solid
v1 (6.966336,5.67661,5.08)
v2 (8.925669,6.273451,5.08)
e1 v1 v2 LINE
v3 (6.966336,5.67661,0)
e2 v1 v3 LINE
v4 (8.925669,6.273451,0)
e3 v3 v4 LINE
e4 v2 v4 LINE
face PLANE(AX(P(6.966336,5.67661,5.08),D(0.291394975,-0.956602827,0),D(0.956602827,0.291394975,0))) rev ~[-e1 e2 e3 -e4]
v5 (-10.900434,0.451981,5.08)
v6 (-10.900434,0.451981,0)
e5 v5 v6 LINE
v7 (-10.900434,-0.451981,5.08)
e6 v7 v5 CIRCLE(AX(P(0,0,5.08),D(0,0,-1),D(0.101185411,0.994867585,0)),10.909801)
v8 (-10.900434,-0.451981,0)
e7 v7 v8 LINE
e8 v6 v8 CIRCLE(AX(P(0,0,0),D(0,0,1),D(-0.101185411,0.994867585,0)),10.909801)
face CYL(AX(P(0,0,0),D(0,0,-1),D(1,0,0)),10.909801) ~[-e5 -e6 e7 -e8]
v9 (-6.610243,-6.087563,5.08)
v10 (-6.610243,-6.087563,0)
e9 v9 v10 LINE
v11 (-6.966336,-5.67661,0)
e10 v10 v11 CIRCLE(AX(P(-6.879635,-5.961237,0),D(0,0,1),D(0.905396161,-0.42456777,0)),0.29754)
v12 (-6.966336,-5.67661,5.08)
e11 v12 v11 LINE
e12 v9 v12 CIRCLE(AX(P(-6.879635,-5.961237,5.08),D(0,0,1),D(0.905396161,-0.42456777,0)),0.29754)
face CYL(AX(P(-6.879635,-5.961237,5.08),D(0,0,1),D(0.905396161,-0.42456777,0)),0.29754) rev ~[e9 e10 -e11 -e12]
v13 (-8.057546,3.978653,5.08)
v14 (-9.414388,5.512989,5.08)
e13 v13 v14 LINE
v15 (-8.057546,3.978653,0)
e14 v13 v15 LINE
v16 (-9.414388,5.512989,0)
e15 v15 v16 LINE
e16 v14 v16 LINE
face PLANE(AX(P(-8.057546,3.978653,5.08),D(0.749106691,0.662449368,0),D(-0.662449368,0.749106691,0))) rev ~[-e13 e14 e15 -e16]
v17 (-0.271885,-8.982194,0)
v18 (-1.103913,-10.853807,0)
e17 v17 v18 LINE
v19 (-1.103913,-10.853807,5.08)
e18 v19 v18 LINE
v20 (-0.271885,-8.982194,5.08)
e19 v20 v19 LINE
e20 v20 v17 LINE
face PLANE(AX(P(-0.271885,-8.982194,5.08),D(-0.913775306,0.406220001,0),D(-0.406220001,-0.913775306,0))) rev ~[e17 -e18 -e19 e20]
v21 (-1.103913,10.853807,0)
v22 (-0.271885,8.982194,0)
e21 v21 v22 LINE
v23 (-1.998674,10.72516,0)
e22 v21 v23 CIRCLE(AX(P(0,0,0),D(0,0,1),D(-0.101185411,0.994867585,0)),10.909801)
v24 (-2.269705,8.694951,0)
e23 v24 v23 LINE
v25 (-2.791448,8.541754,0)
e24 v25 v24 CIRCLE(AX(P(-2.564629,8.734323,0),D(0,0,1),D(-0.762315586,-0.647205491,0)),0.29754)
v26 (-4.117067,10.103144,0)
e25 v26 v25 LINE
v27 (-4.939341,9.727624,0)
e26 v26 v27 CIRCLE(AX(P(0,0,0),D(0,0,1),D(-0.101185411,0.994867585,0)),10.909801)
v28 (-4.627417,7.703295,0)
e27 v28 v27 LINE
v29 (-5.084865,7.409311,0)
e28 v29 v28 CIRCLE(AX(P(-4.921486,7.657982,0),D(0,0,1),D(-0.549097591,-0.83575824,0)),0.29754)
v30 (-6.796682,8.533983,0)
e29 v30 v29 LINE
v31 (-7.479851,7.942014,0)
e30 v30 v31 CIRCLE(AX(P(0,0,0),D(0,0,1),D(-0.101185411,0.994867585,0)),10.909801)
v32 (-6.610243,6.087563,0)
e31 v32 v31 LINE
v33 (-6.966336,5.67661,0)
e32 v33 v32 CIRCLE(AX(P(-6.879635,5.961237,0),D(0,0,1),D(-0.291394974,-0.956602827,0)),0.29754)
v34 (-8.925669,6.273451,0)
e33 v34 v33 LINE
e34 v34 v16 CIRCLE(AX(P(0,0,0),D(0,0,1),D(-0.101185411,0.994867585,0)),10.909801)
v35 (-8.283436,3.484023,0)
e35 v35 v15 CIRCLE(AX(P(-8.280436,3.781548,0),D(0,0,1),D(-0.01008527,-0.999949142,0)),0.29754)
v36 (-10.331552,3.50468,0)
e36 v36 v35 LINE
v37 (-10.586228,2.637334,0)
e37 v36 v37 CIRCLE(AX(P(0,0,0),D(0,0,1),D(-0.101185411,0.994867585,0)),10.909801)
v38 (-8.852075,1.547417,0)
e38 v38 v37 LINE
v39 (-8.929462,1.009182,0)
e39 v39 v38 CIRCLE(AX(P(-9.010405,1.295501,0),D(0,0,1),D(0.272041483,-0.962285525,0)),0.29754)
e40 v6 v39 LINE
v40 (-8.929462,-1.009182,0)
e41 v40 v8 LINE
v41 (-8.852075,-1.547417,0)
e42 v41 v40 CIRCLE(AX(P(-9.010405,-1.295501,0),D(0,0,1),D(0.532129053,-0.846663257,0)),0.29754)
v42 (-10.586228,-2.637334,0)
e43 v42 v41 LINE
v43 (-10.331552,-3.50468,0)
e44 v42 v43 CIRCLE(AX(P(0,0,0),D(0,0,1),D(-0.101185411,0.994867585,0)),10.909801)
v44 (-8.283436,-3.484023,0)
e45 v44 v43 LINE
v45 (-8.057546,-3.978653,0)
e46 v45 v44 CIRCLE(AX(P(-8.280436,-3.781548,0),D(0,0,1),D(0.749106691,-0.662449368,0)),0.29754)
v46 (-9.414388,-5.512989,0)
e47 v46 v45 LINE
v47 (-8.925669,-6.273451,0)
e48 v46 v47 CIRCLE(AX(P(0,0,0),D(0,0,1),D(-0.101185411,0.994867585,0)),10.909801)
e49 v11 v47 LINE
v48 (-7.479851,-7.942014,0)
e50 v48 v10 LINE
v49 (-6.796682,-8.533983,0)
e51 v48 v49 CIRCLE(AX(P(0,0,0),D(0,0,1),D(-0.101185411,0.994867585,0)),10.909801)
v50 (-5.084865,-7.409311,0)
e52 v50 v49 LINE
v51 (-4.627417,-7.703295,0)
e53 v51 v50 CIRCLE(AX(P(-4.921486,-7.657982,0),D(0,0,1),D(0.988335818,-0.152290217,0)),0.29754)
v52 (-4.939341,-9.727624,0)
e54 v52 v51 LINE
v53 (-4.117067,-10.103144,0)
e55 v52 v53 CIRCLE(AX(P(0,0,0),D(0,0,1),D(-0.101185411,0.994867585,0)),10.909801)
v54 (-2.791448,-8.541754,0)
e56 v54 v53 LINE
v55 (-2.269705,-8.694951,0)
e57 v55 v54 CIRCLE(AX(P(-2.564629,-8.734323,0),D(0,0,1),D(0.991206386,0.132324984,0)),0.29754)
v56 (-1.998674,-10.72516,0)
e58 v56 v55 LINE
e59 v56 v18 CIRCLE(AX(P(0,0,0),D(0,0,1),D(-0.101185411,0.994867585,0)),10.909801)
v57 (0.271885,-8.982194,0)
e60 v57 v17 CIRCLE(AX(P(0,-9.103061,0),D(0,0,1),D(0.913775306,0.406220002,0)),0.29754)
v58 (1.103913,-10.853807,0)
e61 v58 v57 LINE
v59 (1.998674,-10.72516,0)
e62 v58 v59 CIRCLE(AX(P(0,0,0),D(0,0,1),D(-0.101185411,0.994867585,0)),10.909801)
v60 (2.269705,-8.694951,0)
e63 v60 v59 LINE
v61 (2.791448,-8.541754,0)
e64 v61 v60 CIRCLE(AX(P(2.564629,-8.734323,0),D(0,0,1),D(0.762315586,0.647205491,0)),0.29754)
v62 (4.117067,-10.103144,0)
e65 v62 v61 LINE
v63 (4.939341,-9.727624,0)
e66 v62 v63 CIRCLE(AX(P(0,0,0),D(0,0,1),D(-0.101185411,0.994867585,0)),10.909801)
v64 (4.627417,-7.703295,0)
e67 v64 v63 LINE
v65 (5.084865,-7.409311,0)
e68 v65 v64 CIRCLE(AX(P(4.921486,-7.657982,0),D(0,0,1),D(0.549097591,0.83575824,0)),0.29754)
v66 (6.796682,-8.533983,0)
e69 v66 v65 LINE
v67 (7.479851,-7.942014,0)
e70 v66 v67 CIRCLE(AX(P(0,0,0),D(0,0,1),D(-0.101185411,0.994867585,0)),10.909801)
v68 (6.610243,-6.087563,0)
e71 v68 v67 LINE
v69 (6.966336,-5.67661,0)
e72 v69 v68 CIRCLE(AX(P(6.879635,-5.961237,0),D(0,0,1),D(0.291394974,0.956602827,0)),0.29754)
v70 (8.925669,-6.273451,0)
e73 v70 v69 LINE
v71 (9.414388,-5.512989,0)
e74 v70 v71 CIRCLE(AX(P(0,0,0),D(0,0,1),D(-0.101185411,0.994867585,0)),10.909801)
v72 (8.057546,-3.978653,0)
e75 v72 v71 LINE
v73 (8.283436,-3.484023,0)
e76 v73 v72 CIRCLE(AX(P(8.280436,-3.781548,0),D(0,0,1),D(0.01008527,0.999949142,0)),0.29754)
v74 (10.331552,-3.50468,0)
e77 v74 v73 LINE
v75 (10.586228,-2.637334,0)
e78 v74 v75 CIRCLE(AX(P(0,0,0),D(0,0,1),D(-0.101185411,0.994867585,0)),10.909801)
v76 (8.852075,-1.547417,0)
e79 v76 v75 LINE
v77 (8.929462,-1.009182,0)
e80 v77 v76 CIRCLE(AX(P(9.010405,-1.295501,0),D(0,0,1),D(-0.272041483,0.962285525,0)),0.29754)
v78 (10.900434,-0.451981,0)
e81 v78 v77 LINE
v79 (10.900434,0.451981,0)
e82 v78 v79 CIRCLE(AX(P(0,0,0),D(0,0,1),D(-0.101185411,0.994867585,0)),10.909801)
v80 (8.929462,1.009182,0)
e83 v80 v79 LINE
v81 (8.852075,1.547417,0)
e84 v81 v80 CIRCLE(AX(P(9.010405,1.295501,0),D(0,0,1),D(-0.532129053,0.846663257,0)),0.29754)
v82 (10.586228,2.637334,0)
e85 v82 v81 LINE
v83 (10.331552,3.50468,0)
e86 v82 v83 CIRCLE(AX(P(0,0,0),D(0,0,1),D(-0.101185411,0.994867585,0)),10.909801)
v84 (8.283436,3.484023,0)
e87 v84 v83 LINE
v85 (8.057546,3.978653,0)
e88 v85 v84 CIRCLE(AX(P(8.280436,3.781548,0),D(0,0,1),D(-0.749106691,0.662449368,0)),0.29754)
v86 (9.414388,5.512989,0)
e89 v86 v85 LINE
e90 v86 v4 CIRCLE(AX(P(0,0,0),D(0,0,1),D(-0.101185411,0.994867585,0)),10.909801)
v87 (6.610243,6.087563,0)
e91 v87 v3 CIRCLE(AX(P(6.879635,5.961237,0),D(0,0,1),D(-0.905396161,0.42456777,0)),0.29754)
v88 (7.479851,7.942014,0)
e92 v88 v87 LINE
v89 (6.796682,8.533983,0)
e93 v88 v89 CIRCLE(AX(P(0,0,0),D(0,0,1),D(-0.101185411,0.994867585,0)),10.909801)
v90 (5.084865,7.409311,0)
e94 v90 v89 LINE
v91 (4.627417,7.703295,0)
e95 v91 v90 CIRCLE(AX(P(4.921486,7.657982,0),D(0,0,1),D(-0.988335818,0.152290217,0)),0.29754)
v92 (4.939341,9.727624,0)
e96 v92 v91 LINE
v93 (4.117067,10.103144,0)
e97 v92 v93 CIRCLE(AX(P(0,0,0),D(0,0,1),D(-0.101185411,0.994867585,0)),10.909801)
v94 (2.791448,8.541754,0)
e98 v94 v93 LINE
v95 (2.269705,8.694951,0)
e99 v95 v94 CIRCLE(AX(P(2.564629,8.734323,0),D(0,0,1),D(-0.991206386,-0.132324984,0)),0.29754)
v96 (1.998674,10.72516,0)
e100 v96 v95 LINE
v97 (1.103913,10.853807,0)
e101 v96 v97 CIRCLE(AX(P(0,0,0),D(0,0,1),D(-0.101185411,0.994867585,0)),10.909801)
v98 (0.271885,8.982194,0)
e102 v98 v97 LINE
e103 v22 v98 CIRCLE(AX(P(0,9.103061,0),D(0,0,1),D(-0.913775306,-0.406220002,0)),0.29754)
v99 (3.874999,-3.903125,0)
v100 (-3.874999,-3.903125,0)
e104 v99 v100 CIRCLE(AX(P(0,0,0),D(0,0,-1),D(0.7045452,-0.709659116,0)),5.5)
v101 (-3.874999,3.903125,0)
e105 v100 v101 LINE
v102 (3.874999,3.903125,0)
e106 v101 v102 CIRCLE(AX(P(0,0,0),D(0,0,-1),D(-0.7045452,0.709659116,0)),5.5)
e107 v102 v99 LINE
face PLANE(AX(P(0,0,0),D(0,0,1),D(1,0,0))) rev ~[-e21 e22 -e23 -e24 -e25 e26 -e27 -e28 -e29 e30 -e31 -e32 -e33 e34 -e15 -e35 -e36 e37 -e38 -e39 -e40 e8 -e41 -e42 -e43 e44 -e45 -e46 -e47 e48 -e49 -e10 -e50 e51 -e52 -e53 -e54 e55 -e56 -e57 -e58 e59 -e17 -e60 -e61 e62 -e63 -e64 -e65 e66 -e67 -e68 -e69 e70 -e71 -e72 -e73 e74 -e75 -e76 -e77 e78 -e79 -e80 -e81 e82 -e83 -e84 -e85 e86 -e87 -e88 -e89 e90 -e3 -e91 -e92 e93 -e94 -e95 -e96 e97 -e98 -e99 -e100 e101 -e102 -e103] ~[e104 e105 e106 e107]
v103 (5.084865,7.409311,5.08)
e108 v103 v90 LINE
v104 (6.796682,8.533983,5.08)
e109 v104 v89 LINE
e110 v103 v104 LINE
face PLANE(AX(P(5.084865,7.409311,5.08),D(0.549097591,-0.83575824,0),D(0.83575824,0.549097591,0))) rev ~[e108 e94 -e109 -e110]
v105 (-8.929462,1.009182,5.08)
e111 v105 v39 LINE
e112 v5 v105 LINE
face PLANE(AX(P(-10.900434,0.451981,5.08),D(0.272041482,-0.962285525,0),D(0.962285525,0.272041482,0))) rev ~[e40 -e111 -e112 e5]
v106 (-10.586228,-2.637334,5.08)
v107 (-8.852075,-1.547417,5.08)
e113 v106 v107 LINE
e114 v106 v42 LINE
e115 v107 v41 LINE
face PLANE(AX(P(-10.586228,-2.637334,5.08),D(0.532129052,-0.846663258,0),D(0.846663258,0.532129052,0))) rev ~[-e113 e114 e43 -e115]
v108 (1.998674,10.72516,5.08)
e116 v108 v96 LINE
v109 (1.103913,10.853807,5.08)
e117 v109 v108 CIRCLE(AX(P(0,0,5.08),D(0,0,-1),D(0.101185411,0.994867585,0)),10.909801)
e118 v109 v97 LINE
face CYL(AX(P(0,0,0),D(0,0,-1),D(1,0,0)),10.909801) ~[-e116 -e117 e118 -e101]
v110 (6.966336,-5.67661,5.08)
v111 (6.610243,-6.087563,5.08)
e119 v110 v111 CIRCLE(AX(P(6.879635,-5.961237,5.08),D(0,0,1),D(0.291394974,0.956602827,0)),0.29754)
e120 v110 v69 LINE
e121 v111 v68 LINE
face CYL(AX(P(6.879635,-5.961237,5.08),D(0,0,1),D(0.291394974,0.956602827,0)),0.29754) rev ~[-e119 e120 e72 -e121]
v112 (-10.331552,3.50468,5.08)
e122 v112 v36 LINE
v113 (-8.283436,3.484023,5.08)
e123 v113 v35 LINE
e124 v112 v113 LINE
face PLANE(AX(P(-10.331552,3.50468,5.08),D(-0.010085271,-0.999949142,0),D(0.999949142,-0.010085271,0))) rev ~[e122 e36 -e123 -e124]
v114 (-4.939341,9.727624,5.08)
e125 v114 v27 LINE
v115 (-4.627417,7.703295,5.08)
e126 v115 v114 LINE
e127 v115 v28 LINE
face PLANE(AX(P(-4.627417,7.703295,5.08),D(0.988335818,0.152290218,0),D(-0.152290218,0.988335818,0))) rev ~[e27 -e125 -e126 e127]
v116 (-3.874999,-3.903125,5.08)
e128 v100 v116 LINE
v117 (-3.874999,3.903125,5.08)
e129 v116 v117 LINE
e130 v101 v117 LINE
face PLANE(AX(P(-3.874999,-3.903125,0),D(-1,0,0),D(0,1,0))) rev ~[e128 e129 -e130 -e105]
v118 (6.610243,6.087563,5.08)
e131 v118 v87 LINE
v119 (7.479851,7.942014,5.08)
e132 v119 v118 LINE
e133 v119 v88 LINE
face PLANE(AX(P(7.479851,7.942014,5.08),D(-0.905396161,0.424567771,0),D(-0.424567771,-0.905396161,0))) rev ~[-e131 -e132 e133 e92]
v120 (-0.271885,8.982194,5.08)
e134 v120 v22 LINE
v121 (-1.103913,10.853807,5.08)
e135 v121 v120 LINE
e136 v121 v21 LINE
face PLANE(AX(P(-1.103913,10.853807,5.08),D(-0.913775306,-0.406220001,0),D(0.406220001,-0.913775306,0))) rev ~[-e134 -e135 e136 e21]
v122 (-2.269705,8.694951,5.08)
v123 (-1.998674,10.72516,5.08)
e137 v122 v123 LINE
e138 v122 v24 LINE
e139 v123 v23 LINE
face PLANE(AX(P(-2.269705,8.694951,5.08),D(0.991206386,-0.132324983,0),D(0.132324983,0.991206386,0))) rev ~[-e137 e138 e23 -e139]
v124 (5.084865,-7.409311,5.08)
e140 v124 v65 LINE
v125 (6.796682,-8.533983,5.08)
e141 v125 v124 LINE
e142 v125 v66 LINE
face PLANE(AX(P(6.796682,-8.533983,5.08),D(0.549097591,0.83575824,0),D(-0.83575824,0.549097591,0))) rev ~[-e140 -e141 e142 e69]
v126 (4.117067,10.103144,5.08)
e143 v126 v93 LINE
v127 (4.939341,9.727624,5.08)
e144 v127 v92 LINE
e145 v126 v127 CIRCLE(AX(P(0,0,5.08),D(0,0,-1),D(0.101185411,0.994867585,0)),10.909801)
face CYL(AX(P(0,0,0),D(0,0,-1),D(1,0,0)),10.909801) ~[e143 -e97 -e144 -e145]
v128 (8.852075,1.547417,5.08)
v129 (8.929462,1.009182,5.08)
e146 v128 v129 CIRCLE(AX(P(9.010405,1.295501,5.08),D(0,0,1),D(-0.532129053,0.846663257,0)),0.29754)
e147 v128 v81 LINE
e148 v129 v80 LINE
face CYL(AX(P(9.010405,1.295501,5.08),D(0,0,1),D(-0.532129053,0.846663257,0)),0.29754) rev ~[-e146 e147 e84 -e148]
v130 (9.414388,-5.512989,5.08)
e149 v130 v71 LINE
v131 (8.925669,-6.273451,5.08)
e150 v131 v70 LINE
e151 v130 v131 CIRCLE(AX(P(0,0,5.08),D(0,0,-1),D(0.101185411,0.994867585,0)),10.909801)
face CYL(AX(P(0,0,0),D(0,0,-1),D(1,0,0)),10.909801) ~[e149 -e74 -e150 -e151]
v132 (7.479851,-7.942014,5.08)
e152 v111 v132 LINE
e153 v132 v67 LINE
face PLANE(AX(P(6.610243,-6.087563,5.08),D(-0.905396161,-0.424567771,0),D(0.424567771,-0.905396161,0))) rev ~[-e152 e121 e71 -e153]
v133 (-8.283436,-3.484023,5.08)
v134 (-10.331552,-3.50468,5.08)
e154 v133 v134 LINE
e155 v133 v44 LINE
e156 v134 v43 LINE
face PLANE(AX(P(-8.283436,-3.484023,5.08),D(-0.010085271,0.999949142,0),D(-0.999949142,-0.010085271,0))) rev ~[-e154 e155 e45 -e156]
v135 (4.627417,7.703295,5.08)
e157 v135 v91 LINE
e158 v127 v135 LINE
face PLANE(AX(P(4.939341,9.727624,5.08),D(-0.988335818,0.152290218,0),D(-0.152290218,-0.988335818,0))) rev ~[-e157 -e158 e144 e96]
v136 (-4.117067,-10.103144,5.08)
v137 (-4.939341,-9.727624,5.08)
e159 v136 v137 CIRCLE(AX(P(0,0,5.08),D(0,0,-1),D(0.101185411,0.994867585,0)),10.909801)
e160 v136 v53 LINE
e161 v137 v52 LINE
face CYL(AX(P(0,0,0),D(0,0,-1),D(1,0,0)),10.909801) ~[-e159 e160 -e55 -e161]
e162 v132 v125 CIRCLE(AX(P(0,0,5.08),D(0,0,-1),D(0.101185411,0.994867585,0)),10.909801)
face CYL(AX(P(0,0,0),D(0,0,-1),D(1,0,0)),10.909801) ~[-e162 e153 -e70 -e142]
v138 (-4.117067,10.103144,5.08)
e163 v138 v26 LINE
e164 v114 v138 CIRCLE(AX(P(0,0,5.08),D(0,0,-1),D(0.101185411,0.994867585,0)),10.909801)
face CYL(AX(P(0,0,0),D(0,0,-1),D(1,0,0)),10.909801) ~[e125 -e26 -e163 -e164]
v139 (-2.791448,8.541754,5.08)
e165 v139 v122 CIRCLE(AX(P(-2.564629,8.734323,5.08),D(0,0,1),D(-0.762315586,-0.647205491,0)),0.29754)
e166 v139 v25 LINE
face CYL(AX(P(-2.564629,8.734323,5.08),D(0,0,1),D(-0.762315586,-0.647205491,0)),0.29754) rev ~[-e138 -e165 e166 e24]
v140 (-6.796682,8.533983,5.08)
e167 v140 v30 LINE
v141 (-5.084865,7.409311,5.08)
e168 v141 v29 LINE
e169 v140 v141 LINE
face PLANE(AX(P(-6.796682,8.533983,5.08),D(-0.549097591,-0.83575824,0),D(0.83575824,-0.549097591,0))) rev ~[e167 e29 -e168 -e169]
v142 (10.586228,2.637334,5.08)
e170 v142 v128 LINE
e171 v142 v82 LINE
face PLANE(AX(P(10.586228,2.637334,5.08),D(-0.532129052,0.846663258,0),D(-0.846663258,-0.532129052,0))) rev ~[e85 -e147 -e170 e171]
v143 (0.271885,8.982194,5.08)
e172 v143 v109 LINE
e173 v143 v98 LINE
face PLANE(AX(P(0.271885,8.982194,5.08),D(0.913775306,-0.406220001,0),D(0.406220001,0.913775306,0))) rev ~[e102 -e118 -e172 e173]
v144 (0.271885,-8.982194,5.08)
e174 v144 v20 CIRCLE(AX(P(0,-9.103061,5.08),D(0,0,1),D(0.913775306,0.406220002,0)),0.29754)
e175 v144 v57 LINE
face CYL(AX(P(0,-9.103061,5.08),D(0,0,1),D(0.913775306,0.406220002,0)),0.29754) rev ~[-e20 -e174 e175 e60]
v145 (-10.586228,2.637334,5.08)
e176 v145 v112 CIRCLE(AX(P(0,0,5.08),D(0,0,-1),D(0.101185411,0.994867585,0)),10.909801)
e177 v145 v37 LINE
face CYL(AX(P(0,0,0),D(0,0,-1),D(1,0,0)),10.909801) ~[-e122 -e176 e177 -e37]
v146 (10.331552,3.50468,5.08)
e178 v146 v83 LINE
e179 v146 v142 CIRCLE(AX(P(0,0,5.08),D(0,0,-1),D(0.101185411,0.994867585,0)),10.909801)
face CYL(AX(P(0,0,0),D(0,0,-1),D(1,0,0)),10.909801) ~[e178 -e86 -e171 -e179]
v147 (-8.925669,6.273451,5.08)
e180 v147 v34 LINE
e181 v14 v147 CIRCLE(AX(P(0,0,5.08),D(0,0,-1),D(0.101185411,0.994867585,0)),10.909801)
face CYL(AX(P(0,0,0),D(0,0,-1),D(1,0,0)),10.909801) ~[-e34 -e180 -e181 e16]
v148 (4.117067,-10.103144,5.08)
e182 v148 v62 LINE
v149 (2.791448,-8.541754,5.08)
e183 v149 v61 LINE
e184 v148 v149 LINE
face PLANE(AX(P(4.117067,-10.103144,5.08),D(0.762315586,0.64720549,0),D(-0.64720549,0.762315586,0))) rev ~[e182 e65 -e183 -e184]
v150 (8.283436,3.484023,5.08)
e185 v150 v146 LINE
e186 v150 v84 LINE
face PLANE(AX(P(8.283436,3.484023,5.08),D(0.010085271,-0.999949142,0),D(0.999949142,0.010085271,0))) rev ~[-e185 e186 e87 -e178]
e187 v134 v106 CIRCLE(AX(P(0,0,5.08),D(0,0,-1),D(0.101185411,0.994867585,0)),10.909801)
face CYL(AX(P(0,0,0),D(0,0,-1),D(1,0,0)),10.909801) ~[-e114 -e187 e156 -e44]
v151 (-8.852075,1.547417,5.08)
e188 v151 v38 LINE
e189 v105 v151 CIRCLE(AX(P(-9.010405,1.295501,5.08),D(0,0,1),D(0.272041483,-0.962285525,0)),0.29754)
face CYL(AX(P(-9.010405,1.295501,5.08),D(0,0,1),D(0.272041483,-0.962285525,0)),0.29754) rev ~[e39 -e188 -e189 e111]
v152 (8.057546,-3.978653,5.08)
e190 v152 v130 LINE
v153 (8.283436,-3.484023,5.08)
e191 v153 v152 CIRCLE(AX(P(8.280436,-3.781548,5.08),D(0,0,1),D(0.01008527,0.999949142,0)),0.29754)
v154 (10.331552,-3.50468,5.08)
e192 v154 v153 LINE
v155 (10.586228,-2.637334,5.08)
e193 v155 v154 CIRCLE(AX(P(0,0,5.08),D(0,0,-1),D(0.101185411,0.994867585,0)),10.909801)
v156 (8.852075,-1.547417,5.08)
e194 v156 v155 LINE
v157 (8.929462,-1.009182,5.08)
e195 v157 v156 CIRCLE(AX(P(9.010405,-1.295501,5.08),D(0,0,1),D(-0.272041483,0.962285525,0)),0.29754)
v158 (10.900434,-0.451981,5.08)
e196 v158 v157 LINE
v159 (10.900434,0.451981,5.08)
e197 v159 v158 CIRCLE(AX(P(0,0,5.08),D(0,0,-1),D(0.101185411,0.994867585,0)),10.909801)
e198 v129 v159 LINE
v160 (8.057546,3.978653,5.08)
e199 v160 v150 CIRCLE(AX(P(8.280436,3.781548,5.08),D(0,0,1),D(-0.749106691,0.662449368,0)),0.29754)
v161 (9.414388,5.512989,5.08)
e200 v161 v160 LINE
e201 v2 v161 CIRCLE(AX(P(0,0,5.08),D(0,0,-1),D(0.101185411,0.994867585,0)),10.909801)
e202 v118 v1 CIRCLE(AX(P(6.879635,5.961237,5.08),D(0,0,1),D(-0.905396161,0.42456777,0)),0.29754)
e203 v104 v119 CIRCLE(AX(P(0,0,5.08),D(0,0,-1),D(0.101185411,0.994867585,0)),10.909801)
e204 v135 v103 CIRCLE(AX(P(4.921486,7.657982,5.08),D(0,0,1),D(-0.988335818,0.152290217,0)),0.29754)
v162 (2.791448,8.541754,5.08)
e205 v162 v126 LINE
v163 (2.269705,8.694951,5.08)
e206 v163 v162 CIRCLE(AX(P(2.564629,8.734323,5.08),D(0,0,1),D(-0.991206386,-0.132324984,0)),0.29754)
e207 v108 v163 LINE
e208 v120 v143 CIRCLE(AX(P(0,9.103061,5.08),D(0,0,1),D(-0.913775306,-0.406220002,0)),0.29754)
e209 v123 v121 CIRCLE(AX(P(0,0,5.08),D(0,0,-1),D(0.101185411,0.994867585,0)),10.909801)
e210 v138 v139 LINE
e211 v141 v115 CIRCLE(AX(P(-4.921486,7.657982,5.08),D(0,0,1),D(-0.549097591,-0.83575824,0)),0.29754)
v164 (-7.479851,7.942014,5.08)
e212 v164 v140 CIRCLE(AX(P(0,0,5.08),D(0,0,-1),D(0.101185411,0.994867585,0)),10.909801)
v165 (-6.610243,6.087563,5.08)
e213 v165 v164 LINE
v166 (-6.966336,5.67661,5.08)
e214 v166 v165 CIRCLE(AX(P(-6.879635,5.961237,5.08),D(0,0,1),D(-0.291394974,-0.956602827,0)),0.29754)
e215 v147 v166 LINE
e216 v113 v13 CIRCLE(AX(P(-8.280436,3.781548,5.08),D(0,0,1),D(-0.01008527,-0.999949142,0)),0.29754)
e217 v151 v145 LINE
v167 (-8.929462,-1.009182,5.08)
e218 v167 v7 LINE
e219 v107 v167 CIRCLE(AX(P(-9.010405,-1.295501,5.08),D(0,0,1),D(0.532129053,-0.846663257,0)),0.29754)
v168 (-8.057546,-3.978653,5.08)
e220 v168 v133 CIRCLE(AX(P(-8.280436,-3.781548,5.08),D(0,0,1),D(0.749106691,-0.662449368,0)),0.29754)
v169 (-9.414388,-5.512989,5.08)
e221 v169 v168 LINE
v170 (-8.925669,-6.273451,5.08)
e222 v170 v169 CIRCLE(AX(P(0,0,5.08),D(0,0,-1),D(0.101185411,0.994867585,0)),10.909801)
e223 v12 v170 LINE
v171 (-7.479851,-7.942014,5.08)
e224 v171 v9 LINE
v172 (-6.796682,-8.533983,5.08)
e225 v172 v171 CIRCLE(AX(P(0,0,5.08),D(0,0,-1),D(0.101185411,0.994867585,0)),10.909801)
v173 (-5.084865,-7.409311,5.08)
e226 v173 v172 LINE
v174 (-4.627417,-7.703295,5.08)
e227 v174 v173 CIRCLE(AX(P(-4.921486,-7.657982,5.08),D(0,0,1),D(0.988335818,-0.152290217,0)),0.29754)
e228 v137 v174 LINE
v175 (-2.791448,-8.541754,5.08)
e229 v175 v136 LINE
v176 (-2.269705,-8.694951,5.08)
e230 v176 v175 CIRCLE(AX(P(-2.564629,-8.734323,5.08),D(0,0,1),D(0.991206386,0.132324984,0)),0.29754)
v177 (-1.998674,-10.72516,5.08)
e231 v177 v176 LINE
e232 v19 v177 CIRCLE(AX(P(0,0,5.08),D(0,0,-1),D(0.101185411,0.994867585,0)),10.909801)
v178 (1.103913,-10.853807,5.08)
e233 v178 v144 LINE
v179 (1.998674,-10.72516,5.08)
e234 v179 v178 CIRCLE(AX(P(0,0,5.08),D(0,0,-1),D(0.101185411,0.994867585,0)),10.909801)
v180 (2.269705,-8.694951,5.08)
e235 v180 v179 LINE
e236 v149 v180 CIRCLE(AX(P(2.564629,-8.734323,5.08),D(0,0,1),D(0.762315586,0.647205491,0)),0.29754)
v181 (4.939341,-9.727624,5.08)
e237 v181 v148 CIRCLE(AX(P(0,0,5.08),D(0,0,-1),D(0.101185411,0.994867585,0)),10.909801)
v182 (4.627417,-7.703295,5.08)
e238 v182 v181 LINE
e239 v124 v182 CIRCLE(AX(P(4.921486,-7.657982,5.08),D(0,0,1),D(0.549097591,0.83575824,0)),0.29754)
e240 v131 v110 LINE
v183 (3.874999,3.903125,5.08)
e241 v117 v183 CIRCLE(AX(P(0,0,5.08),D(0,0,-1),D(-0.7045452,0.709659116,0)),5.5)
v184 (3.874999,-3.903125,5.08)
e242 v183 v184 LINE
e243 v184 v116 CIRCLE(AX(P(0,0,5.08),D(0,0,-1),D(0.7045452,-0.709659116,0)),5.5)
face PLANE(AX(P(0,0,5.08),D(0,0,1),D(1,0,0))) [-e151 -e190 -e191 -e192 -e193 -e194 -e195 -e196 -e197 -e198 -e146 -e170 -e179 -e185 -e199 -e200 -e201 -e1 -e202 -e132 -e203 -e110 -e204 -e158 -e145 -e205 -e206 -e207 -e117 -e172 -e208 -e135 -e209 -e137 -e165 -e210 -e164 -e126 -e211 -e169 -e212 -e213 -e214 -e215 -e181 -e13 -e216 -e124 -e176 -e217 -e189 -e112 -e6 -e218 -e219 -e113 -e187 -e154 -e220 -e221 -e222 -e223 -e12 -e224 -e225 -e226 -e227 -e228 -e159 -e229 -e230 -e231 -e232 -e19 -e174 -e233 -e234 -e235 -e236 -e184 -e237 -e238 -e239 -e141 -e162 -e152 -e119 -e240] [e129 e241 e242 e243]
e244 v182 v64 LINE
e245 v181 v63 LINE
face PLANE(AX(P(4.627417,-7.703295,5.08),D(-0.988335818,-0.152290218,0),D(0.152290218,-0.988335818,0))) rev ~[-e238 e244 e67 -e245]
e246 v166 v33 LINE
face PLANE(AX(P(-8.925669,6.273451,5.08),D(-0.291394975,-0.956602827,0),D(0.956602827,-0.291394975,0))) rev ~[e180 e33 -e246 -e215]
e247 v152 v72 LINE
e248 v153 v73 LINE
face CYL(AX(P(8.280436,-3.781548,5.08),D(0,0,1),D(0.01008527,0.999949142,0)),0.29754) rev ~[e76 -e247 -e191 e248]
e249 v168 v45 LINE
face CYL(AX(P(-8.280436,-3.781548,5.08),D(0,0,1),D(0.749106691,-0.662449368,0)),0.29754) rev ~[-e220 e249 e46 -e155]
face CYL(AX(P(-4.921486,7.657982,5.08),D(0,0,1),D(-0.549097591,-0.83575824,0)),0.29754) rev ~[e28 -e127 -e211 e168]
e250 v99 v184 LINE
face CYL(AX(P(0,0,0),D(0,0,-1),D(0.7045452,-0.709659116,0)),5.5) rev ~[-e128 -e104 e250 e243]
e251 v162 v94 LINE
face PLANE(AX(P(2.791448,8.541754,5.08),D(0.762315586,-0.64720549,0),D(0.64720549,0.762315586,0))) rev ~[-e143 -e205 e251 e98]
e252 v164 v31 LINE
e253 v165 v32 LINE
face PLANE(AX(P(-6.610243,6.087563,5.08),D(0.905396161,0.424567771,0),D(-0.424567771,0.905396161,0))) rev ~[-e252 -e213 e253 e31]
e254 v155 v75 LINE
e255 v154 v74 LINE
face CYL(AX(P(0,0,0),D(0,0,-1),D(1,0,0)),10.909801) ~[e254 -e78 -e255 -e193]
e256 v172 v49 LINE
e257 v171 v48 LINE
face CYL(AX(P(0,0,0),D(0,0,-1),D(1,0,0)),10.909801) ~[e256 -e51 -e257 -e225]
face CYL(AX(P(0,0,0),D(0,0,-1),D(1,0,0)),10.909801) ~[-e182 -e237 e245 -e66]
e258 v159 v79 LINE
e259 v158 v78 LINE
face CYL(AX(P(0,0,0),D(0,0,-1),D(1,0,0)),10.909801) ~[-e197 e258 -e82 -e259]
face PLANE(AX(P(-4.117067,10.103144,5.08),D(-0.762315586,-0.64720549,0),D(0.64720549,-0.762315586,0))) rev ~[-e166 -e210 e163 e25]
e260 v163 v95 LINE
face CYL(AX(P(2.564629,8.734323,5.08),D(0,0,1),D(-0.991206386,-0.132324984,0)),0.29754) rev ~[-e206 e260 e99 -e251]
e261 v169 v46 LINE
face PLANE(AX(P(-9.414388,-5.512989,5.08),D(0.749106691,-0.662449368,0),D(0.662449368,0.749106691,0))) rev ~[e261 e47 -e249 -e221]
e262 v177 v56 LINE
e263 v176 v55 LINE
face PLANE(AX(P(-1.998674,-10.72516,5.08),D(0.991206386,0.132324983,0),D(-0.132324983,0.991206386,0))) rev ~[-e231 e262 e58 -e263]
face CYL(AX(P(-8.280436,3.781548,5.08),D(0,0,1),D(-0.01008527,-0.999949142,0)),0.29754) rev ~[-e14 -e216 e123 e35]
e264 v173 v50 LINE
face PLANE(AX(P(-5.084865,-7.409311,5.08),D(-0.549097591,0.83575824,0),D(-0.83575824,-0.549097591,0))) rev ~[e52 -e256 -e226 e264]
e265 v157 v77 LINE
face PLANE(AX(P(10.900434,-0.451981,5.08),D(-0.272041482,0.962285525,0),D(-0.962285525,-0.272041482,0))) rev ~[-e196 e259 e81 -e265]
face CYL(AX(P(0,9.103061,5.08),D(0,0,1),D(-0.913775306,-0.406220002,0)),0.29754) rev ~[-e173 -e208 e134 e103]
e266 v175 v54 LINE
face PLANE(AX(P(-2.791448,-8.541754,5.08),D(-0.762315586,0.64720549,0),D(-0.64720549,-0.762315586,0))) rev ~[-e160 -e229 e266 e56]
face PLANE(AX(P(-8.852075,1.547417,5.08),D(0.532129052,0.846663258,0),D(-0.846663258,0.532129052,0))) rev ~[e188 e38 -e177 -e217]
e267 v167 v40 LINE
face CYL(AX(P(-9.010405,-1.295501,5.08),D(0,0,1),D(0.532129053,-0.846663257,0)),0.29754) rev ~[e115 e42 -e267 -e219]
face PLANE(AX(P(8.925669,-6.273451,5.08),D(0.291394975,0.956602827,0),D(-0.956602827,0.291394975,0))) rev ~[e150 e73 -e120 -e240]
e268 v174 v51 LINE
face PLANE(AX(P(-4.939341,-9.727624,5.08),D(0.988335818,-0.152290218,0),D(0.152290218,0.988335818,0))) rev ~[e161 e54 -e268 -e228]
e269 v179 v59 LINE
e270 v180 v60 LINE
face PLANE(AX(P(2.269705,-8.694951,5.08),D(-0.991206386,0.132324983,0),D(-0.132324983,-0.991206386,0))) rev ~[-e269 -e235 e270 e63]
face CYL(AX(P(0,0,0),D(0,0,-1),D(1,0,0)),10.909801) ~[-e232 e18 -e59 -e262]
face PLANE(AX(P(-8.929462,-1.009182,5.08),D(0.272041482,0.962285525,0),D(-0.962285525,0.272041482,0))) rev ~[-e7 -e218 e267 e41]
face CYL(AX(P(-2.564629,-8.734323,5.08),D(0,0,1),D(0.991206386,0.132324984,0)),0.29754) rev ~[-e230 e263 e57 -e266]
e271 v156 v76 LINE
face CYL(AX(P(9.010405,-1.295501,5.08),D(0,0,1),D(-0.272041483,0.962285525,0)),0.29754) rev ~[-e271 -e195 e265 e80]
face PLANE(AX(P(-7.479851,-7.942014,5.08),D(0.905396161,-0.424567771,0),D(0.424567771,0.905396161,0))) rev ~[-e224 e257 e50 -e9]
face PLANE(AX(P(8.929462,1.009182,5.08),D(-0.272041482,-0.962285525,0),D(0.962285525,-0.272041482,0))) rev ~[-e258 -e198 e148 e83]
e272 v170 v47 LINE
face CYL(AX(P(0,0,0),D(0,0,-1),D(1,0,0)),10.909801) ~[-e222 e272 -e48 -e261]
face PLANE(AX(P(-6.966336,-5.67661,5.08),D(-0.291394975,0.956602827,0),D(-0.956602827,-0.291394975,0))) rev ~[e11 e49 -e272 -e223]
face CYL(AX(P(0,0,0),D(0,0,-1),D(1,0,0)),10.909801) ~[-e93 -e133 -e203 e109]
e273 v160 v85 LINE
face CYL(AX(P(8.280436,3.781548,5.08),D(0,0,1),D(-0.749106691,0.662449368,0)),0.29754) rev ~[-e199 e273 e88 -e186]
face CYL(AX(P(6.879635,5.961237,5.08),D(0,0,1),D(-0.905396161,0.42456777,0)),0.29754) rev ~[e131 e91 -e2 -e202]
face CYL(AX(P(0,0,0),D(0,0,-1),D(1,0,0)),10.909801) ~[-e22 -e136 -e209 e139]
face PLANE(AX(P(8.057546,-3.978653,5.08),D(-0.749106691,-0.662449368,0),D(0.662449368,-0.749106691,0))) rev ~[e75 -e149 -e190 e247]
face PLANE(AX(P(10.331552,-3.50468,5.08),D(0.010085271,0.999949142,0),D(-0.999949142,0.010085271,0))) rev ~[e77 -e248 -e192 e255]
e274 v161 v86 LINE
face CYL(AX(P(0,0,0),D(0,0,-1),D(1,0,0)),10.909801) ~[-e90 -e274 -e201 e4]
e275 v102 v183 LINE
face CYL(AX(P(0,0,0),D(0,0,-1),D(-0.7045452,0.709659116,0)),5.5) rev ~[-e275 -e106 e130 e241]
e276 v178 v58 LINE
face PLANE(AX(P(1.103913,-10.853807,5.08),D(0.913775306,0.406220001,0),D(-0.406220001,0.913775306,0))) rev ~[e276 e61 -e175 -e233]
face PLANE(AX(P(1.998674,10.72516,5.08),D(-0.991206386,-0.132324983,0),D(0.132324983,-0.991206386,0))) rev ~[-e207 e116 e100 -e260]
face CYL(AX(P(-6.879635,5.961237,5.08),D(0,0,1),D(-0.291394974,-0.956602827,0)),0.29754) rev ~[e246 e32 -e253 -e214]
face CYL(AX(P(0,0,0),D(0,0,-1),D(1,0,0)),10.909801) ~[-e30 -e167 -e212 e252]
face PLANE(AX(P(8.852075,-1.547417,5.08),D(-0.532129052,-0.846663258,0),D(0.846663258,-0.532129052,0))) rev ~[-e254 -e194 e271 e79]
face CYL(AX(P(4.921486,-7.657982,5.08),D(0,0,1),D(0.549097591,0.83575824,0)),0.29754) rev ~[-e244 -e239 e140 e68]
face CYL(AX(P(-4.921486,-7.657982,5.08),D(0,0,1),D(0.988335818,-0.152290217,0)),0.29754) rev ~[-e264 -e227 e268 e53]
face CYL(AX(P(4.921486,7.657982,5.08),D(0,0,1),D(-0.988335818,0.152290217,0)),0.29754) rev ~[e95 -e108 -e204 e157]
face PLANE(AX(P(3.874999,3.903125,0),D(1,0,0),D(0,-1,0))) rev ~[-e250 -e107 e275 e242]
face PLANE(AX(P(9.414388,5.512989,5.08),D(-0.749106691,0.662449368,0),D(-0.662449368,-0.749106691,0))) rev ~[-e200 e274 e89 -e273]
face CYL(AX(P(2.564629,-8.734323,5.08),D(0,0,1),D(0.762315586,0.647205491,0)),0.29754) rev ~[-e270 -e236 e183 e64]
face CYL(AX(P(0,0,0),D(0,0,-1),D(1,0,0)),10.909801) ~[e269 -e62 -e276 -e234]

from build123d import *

# Parameters (mm, degrees)
F0_R            = 10.909800859
F1_DEPTH        = 5.08
F3_DEPTH        = 5.08
F3_COPIES_COUNT = 22


# Not quite as in the source:
# - a pattern or mirror of a feature is missing from the dataset's text; its kind, count and spacing are read off the source's solid


with BuildPart() as f1:
    # F0 (on Top) → F1 (new body)
    with BuildSketch(Plane.XY):
        Circle(F0_R)
        with BuildLine():
            ThreePointArc((3.8749986, -3.9031251389), (0, -5.5), (-3.8749986, -3.9031251389))
            Line((-3.8749986, -3.9031251389), (-3.8749986, 3.9031251389))
            ThreePointArc((-3.8749986, 3.9031251389), (0, 5.5), (3.8749986, 3.9031251389))
            Line((3.8749986, 3.9031251389), (3.8749986, -3.9031251389))
        make_face(mode=Mode.SUBTRACT)
    extrude(amount=F1_DEPTH)

    # F2 (on face) → F3 (cut, through all)
    with BuildSketch(Plane.XY.offset(5.08)):
        with BuildLine():
            Line((0.2718847261, 8.9821943232), (1.1039126824, 10.8538072386))
            ThreePointArc((1.1039126824, 10.8538072386), (0, 10.909800859), (-1.1039126824, 10.8538072386))
            Line((-1.1039126824, 10.8538072386), (-0.2718847261, 8.9821943232))
            ThreePointArc((-0.2718847261, 8.9821943232), (0, 8.8055210085), (0.2718847261, 8.9821943232))
        make_face()
    f3 = extrude(amount=-F3_DEPTH, mode=Mode.SUBTRACT)

    # F3_copies: F3 ×22 about axis
    f3_copies_axis = Axis((0, 0, 0), (0, 0, 1))
    for i in range(1, F3_COPIES_COUNT):
        add(f3.rotate(f3_copies_axis, i * 360 / F3_COPIES_COUNT), mode=Mode.SUBTRACT)


solid = f1.part
